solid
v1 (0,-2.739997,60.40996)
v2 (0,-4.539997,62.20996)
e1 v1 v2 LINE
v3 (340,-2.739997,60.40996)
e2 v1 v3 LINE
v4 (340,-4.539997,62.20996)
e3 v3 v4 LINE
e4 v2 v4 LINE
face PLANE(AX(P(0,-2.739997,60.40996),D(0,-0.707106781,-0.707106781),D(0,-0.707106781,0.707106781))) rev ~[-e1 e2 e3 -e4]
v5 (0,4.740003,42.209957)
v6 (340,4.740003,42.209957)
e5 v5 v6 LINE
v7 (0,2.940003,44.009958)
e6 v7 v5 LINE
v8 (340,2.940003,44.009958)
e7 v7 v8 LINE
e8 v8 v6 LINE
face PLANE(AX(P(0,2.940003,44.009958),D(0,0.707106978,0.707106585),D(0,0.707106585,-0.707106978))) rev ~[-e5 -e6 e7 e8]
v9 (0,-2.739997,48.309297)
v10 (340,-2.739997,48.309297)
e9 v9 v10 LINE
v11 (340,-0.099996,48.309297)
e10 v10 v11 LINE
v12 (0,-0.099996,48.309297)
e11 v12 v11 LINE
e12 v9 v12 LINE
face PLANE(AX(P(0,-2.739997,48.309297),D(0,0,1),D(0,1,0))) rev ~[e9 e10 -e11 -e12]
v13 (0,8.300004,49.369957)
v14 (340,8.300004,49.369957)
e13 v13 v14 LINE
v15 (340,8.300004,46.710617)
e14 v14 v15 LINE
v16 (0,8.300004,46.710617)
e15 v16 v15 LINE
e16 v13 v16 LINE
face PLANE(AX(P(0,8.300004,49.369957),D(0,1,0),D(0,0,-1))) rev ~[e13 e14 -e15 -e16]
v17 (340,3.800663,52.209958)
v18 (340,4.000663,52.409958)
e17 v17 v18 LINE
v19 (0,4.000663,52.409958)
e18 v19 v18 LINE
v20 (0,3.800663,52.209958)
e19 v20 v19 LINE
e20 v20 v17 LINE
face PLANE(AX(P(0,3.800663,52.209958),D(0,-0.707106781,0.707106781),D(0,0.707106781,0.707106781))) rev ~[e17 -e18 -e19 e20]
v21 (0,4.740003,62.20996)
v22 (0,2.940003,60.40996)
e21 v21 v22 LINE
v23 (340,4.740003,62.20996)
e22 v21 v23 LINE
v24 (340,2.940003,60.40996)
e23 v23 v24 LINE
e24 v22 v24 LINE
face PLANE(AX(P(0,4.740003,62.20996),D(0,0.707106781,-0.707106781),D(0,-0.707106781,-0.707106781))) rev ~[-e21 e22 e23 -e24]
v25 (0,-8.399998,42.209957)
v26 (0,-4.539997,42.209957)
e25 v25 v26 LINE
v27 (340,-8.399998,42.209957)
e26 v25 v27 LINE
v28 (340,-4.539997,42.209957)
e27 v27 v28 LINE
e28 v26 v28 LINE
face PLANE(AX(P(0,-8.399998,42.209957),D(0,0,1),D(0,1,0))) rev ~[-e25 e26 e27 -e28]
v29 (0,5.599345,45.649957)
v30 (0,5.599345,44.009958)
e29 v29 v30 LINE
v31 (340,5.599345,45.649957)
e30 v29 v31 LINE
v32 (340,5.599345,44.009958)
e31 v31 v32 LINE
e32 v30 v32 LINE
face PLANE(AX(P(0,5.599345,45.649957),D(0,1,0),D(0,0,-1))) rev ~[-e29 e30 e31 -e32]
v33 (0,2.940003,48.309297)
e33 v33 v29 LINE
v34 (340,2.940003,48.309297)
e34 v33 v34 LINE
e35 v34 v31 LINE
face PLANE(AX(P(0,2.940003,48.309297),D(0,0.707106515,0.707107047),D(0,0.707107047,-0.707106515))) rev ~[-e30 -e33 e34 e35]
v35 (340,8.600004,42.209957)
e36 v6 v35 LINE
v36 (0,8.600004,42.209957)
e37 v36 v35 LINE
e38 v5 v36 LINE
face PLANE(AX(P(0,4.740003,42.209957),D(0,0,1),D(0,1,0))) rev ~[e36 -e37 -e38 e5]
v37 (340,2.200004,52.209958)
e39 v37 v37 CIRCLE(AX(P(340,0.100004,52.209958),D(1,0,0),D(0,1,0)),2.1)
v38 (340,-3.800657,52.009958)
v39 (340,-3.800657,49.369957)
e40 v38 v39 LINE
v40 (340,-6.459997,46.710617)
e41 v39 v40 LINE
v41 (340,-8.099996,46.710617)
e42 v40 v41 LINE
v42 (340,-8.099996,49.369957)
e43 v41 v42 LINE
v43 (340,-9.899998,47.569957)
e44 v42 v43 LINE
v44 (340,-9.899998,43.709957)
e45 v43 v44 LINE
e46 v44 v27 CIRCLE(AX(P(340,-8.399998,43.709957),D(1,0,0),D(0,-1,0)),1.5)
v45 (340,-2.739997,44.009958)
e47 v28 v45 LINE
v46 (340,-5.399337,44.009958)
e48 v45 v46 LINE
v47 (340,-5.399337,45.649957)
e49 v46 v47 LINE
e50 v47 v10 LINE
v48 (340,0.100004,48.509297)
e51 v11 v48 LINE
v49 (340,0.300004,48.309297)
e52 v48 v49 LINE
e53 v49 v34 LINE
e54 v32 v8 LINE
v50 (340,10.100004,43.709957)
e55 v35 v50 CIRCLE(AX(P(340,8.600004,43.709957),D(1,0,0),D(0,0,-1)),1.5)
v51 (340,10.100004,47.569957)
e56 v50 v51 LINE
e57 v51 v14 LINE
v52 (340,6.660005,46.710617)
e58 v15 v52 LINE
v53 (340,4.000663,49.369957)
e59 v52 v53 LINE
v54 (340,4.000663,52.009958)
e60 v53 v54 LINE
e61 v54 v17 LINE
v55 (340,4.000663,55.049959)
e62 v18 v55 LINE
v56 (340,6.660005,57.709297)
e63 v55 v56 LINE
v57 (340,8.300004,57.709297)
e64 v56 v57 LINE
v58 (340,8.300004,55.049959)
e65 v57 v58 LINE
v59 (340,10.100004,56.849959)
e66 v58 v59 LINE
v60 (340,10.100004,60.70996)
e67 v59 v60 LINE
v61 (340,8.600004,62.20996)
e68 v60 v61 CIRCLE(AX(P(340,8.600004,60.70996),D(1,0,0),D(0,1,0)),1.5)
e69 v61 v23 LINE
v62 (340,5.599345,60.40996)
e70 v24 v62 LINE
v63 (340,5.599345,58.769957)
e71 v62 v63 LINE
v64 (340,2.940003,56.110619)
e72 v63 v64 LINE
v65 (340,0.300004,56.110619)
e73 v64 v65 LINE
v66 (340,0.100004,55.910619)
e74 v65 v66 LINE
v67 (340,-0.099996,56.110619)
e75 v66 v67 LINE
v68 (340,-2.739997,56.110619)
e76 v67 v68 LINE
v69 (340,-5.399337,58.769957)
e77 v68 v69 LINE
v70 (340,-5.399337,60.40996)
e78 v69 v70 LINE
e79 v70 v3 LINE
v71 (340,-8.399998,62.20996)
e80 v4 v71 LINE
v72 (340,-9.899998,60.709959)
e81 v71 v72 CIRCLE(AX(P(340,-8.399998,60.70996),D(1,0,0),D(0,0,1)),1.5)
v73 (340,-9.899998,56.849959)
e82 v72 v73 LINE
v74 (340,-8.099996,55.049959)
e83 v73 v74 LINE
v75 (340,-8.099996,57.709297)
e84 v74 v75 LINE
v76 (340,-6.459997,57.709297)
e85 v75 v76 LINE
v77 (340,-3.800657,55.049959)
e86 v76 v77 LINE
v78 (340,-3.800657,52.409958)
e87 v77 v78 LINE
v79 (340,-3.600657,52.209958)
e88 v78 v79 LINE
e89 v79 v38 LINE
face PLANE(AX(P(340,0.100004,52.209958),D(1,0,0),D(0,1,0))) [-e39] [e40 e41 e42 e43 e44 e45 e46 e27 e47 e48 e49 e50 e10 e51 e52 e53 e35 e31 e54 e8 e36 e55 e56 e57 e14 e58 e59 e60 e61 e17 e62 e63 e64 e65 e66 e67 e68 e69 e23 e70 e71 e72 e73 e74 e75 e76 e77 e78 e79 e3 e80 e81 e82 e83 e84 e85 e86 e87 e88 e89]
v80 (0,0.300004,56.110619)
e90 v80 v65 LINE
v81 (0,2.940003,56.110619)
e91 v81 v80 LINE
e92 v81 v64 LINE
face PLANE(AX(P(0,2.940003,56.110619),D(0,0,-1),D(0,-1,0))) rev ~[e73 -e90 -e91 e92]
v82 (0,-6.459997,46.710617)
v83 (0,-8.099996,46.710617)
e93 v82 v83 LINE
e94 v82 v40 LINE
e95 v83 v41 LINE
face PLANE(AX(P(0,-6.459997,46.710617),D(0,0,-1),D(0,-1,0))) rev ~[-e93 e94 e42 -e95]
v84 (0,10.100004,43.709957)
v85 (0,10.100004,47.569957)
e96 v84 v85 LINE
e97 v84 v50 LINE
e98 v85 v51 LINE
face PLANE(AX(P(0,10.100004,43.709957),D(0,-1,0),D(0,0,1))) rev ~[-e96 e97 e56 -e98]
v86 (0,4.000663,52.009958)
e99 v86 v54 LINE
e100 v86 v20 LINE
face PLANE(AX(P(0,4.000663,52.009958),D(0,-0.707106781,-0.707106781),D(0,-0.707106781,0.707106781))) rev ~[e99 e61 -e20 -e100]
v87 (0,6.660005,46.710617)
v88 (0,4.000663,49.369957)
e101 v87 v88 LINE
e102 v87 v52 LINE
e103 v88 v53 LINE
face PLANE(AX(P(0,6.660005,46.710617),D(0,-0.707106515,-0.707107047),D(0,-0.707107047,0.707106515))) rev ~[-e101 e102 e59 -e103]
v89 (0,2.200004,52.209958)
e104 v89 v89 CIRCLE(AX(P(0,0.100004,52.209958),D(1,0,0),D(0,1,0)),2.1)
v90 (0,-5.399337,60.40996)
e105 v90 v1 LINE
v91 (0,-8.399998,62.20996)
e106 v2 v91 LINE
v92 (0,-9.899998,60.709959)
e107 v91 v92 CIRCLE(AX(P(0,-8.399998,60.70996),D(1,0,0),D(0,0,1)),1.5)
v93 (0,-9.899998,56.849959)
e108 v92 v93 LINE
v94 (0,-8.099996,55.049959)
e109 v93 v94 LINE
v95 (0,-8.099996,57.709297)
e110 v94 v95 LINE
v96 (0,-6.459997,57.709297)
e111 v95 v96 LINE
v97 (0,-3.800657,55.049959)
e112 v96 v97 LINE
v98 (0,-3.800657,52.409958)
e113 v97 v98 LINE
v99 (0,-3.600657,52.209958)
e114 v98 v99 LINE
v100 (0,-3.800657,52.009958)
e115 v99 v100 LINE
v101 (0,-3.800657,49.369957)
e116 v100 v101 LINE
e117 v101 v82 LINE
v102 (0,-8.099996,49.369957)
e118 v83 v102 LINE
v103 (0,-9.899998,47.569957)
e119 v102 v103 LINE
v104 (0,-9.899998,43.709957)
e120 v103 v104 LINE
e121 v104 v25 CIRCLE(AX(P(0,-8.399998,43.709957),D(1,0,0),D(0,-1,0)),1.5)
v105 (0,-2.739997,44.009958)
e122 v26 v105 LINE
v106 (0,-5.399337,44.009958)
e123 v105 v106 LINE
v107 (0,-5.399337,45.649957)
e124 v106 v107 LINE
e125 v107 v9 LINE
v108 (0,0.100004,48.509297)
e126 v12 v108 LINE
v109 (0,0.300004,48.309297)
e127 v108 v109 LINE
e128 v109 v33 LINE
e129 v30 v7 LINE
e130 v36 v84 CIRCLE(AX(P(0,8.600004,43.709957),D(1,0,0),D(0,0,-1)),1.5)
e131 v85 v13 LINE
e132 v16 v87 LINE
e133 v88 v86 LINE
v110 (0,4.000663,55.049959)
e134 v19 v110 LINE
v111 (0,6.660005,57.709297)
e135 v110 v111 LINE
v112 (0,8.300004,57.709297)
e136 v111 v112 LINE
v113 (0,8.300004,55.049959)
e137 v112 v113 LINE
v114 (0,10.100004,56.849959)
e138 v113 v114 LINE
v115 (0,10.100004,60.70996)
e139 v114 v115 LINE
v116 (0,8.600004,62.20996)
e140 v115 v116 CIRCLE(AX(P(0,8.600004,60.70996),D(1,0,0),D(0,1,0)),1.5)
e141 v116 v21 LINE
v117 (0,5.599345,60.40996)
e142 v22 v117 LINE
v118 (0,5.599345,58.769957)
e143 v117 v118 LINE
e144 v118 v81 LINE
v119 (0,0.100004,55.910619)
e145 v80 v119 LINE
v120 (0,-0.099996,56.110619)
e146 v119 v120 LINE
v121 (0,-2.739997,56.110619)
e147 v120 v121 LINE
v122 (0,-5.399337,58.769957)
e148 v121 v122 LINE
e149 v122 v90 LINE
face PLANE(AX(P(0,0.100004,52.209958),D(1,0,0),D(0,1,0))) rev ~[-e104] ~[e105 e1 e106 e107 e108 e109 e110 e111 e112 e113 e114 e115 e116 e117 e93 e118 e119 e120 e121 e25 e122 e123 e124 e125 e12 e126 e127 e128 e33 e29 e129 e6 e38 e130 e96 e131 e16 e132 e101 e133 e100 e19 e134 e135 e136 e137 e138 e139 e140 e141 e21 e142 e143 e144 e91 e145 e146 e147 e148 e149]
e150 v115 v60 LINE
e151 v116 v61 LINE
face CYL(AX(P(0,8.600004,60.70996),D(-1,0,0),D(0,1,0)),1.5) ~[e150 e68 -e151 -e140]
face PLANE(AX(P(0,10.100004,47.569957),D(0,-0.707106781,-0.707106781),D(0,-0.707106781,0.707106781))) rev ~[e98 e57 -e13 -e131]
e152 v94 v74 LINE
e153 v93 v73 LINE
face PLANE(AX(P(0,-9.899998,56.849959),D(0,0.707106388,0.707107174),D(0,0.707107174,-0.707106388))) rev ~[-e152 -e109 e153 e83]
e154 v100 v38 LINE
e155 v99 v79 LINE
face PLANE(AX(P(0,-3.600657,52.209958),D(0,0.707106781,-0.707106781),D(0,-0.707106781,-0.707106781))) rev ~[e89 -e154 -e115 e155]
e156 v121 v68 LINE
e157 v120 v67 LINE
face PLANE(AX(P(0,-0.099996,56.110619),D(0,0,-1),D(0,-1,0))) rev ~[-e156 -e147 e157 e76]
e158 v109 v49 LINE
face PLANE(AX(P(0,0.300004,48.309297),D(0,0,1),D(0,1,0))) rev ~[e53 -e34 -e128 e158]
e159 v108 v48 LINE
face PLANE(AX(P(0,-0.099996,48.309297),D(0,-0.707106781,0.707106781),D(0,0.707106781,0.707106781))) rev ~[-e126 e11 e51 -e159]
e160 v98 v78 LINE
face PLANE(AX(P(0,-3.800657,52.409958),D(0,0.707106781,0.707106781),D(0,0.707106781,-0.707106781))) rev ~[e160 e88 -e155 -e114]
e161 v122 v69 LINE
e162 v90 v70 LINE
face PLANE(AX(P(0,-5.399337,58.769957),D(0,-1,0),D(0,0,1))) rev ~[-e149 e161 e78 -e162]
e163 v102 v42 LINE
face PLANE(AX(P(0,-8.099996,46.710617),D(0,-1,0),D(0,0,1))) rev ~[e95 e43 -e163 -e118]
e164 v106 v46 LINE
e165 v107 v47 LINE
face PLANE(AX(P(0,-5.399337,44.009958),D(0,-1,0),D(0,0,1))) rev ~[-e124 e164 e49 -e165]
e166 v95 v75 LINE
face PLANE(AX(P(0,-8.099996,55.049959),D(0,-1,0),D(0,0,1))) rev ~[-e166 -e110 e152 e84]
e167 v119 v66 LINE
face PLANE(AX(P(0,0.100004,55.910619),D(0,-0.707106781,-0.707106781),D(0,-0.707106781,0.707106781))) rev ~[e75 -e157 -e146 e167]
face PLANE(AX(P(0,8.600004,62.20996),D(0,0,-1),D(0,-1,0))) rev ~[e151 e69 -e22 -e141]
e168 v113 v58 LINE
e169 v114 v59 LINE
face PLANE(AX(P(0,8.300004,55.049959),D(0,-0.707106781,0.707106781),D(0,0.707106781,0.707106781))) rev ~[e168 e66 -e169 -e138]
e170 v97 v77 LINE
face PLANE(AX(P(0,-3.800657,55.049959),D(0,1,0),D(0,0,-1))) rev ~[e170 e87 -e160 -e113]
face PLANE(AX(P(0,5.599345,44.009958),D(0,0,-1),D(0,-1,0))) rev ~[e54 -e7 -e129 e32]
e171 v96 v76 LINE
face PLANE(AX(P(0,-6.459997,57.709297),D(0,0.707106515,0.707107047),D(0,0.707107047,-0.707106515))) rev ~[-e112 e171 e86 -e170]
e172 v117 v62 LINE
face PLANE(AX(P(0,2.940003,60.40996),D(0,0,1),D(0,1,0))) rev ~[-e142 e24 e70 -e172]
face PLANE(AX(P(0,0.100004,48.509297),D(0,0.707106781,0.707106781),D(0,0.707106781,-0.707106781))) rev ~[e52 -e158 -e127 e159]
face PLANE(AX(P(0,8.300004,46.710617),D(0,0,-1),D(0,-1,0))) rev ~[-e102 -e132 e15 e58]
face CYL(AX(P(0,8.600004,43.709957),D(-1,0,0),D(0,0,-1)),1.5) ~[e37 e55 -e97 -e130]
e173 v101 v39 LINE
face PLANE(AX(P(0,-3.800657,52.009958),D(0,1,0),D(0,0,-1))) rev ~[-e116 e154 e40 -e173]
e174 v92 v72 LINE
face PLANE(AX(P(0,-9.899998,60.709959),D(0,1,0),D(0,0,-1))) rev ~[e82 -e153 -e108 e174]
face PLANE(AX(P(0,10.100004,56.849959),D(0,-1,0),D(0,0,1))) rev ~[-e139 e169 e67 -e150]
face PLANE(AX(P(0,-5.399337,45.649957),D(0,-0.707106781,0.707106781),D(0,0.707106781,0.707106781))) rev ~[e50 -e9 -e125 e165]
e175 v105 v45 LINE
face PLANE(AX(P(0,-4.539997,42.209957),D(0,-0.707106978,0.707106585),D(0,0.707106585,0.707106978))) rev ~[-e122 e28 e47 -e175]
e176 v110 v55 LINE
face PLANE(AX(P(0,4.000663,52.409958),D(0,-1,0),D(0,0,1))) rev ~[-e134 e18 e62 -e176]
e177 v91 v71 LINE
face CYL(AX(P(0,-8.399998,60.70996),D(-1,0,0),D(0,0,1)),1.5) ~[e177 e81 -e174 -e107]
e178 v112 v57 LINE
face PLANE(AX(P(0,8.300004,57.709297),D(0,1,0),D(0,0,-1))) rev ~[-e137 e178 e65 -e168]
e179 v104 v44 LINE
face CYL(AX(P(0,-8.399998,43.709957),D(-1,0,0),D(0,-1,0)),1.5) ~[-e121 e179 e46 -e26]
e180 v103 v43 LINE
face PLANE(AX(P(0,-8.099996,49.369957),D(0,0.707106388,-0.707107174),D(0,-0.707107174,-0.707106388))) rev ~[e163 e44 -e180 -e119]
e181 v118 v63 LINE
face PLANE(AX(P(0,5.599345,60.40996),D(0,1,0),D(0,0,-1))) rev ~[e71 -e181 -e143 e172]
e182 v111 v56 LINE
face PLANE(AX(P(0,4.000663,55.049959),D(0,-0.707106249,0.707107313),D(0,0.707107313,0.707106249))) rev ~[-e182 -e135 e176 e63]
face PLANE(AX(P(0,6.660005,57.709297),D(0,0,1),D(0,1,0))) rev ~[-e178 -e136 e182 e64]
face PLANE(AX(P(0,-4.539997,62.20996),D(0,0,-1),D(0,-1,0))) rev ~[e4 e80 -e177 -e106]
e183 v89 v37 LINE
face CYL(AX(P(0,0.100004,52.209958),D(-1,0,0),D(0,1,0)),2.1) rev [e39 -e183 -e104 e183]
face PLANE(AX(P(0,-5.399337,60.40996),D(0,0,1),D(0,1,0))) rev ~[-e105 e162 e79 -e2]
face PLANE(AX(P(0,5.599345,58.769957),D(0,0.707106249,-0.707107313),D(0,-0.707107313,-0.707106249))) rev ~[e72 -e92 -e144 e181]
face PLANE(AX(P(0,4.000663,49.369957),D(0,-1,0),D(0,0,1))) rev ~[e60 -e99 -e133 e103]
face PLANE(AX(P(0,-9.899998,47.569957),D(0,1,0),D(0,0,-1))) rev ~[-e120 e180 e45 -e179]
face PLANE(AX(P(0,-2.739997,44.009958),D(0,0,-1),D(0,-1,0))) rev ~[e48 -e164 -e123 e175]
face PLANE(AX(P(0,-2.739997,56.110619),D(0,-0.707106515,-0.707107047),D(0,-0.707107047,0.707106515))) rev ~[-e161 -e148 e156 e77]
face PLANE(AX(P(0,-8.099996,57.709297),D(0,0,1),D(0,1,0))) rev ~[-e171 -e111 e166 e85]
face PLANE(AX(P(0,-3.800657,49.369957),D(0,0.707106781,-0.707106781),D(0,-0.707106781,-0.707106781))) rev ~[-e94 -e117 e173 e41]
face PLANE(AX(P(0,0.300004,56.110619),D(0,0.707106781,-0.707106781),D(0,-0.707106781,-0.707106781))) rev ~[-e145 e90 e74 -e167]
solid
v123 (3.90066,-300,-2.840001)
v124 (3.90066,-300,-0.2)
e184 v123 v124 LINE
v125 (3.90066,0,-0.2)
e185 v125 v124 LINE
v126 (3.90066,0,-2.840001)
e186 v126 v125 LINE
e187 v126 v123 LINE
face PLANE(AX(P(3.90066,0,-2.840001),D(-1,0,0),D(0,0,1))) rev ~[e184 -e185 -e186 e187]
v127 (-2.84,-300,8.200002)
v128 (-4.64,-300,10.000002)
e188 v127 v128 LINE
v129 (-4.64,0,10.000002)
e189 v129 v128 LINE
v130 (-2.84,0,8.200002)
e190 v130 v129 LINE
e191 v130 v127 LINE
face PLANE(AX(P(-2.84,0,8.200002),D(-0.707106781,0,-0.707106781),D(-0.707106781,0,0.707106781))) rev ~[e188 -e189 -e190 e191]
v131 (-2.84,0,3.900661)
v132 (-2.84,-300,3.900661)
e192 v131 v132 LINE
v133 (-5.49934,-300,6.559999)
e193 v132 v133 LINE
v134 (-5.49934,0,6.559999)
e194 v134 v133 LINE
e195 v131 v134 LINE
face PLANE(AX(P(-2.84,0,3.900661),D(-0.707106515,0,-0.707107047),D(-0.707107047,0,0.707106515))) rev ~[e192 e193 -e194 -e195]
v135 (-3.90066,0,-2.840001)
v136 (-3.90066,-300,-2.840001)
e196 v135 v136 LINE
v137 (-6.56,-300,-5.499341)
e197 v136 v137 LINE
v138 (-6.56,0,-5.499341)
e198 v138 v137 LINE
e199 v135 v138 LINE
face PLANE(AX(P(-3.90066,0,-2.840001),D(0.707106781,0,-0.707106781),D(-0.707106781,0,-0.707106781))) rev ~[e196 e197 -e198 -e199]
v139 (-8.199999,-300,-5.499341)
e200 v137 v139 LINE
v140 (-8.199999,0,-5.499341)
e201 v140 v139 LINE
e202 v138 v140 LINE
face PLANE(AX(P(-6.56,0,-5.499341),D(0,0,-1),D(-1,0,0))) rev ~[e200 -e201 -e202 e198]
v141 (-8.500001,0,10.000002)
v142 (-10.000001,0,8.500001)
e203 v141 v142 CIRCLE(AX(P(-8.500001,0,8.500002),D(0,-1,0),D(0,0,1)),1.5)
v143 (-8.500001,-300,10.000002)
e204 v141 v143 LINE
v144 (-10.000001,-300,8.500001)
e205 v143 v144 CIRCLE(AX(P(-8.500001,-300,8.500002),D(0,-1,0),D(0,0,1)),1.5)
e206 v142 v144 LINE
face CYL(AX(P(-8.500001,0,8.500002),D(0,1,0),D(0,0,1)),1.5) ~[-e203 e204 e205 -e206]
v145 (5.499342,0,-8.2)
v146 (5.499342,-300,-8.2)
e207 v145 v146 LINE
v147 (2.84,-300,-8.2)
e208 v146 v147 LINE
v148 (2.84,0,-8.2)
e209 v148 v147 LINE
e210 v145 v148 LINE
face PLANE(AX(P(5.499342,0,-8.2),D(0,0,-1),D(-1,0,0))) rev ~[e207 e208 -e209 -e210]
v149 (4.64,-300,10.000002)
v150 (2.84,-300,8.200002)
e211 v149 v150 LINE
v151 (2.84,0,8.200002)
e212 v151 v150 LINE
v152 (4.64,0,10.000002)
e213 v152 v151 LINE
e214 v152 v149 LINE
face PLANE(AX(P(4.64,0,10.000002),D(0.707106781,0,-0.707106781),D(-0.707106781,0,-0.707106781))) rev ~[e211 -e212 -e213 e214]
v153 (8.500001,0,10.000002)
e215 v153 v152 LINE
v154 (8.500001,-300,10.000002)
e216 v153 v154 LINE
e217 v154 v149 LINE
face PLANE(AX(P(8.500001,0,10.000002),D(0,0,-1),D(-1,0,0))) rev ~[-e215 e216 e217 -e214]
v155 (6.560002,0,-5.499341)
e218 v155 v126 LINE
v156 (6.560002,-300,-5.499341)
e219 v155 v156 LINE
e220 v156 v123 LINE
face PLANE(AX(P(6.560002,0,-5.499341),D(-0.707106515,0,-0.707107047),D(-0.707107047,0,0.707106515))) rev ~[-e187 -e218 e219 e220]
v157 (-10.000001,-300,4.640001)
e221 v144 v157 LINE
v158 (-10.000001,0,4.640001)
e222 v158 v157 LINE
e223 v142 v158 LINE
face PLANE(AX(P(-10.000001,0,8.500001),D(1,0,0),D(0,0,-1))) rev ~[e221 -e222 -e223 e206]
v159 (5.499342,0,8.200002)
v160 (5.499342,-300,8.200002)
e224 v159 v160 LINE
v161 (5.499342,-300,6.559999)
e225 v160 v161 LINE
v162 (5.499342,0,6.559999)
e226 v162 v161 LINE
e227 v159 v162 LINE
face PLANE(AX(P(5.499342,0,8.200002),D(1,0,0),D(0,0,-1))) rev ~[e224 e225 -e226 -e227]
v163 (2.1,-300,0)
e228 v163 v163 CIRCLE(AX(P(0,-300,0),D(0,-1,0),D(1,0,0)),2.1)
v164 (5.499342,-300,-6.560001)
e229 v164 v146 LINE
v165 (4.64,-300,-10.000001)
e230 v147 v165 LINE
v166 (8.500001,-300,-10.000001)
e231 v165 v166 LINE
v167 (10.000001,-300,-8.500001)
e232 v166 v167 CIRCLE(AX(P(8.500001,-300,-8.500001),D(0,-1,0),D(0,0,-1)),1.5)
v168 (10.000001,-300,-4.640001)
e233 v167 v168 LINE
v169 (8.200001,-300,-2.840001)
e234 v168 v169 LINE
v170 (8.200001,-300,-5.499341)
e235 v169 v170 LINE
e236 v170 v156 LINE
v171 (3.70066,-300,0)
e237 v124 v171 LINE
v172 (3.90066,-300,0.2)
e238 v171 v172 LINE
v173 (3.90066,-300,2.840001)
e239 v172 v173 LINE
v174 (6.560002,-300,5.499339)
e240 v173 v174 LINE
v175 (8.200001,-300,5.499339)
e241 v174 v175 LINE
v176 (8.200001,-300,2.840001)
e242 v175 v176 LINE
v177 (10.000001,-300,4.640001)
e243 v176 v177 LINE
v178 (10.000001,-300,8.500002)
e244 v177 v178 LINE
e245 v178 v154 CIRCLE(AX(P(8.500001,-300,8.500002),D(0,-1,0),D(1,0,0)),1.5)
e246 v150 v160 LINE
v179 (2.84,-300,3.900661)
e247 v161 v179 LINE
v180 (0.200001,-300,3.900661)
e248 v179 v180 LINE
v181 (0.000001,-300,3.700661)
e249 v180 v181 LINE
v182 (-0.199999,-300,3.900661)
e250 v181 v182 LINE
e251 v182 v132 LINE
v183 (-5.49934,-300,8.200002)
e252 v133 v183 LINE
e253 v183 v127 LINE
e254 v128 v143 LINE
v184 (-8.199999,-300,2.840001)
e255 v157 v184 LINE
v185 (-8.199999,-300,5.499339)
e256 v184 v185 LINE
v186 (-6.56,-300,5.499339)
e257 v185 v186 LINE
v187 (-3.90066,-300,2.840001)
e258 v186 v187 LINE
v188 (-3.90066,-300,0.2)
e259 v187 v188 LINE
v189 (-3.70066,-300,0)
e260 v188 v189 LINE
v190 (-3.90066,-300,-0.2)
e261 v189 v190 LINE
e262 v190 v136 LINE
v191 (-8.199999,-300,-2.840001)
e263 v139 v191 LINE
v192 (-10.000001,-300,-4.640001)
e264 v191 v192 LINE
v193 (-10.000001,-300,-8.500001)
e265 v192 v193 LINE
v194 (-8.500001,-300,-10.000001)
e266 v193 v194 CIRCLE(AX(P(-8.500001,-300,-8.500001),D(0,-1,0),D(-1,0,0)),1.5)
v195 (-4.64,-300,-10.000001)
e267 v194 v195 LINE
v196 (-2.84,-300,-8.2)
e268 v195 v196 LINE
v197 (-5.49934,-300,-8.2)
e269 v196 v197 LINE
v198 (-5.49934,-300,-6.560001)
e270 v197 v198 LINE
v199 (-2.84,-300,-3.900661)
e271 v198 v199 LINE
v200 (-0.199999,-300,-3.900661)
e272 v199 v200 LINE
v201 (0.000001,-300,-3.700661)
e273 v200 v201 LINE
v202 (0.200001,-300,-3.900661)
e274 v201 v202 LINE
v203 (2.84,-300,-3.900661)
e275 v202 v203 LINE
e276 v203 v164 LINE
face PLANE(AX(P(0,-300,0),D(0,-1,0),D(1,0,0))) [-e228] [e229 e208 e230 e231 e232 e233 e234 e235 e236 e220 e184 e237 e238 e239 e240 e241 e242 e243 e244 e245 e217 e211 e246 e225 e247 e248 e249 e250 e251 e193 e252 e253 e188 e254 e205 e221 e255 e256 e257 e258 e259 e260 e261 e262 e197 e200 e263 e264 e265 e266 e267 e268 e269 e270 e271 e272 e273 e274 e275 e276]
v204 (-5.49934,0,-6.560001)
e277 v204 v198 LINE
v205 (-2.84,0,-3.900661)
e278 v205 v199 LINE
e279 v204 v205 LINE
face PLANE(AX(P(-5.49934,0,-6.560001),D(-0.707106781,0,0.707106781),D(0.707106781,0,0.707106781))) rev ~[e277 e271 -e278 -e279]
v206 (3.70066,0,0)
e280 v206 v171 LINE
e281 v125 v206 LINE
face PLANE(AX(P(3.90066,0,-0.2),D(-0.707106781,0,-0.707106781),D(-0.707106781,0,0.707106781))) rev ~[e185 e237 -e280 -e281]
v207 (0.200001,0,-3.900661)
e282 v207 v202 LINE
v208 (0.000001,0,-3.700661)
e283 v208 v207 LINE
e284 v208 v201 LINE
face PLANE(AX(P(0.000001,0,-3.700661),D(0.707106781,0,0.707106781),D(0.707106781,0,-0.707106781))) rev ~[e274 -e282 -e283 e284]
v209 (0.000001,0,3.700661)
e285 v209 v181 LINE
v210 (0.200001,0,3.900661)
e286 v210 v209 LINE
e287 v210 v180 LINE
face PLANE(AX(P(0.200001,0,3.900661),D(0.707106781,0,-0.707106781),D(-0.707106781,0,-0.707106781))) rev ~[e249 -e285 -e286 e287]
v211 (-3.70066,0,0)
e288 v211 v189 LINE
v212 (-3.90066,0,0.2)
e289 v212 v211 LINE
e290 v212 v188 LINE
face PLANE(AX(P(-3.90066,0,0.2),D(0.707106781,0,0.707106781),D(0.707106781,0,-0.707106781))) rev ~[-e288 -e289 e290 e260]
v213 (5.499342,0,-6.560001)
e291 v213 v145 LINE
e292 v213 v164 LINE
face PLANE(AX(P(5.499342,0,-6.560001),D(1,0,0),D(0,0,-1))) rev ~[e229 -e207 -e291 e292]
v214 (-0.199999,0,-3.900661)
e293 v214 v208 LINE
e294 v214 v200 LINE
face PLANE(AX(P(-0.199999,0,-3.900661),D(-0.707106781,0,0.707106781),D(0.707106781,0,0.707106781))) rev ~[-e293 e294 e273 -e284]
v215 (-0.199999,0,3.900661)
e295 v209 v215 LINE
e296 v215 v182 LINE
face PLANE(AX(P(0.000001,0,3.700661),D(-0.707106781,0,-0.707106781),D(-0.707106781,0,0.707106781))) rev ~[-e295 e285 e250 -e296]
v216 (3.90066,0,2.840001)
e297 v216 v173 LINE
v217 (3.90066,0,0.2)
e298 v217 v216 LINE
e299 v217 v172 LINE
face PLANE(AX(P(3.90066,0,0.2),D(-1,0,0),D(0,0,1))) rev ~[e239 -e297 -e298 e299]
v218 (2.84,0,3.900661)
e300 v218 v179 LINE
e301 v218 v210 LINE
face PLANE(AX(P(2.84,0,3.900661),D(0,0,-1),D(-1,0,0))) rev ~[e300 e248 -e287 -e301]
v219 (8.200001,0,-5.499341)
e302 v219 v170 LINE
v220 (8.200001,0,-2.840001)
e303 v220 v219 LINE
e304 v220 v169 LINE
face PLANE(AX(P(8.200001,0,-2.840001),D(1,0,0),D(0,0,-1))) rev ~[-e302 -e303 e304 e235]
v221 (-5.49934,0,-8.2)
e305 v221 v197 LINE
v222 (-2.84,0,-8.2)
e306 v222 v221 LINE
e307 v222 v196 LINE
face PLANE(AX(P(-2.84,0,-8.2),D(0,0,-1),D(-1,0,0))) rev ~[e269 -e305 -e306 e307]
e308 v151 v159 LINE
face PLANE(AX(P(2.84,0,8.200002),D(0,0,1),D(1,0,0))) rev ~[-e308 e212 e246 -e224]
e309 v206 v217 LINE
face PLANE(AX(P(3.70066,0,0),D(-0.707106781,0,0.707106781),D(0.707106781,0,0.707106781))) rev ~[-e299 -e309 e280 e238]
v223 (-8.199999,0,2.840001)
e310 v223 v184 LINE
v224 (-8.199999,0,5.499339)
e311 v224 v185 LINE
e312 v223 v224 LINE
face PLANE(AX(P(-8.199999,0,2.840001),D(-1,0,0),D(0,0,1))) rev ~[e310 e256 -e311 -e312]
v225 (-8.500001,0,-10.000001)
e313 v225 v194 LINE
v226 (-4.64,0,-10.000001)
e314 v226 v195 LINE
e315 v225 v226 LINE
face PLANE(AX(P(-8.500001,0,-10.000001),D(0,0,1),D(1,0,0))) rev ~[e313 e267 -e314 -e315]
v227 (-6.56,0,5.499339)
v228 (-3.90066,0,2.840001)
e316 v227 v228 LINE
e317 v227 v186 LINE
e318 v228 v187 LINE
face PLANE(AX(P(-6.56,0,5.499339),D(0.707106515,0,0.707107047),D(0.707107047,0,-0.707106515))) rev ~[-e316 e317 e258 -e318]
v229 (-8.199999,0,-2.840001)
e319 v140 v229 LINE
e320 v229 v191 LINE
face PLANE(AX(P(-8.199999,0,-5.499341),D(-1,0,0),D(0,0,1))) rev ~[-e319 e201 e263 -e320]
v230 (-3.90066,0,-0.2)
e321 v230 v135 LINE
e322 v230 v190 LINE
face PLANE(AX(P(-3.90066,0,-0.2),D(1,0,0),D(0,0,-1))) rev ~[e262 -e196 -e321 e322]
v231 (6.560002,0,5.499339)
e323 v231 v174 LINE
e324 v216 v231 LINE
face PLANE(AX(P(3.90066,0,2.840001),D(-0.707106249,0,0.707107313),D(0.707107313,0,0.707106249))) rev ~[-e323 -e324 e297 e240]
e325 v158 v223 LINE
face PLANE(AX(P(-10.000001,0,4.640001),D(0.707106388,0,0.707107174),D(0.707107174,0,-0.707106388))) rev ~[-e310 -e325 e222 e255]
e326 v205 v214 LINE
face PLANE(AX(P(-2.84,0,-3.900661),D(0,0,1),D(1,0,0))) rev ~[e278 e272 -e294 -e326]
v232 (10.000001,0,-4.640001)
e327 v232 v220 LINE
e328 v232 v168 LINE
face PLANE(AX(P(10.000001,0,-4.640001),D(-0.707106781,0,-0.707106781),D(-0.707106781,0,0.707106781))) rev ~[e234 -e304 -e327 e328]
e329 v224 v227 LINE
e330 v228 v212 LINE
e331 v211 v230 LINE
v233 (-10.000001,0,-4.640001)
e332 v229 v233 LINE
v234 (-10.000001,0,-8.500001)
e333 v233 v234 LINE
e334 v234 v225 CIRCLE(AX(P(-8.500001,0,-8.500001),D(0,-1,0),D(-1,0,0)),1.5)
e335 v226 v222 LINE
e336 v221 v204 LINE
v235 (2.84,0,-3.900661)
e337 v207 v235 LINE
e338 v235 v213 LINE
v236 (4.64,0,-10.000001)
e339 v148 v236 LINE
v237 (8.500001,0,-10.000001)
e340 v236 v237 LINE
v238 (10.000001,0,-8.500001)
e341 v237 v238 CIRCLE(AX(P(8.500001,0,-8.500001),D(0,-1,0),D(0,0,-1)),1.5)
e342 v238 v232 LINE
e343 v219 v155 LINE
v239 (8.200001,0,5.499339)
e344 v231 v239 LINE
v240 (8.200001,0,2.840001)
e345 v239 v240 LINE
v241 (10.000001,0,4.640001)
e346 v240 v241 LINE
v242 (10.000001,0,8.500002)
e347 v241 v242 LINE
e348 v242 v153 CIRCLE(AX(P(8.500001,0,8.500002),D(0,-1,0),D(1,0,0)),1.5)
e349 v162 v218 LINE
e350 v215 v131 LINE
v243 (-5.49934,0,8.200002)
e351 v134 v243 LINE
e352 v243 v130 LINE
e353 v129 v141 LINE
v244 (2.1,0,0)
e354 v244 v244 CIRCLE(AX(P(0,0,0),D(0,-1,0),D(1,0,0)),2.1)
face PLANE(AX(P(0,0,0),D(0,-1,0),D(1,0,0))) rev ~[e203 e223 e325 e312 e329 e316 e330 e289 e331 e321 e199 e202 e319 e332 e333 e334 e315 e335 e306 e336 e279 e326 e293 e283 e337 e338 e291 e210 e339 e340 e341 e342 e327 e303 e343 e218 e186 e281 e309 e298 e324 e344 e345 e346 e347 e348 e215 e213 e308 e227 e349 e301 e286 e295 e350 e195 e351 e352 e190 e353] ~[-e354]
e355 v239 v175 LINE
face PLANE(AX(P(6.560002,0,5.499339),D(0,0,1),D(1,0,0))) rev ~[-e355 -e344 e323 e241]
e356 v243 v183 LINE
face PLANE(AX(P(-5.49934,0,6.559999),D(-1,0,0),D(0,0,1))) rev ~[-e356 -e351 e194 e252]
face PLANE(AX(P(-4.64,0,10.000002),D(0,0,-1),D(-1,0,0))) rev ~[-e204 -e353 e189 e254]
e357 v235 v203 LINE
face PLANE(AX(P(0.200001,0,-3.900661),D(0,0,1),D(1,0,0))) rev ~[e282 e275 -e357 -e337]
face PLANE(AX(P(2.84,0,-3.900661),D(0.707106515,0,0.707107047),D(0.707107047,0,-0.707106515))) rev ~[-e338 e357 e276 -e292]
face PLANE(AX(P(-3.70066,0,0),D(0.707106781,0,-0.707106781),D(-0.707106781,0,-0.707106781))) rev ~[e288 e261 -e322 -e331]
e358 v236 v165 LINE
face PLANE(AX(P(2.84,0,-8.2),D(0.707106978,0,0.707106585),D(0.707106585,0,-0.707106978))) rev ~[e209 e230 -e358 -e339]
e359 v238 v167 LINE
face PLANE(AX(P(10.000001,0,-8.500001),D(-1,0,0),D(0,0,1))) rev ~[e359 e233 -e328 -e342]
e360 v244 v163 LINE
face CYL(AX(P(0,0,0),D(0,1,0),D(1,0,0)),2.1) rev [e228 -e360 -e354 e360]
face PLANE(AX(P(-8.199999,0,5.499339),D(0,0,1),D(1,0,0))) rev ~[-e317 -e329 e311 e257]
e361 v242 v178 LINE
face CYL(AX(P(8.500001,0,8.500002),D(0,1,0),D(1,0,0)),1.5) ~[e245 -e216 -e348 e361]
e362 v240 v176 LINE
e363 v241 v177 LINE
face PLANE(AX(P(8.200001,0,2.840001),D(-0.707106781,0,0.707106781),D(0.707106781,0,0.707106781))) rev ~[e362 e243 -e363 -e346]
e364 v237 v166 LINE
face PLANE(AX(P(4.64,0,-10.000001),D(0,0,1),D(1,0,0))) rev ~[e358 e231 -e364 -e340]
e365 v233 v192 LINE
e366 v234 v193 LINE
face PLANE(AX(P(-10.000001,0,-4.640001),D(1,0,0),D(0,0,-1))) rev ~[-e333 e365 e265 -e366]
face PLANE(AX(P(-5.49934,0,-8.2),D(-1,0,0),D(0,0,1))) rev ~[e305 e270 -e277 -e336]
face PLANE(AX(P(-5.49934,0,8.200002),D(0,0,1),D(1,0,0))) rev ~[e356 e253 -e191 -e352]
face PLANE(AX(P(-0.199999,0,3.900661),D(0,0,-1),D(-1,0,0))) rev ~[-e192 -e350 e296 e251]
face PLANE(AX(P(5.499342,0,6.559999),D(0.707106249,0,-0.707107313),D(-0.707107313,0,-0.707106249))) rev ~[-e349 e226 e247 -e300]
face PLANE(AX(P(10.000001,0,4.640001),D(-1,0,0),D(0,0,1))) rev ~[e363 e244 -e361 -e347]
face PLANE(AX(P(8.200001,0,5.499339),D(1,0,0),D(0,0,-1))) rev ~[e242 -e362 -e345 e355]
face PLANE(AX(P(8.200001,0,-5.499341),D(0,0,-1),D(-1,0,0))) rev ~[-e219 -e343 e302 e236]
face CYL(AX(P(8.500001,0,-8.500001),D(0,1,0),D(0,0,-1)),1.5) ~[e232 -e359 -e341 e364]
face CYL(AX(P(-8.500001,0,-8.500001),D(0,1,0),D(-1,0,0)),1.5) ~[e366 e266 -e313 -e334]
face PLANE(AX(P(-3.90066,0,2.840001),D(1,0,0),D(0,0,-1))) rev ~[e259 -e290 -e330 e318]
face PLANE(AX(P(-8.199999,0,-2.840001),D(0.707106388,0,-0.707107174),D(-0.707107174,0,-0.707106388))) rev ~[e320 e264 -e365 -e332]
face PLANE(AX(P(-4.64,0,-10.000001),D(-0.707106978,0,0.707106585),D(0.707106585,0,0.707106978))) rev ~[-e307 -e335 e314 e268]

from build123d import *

# Parameters (mm, degrees)
F0_R     = 2.1
F2_DEPTH = 300
F1_R     = 2.1
F3_DEPTH = 340


# Not quite as in the source:
# - ends of sketch curves that miss each other by under 0.0002 mm in the source are joined


with BuildPart() as f2:
    # F0 (on Front) → F2 (new body)
    with BuildSketch(Plane.XZ):
        with BuildLine():
            Line((-4.6400004426, 10.0000019805), (-8.5000014426, 10.0000019805))
            ThreePointArc((-8.5000014426, 10.0000019805), (-9.560661968, 9.5606617987), (-10.0000014426, 8.5000009805))
            Line((-10.0000014426, 8.5000009805), (-10.0000014426, 4.6400009805))
            Line((-10.0000014426, 4.6400009805), (-8.1999994426, 2.8400009805))
            Line((-8.1999994426, 2.8400009805), (-8.1999994426, 5.4993389805))
            Line((-8.1999994426, 5.4993389805), (-6.5600004426, 5.4993389805))
            Line((-6.5600004426, 5.4993389805), (-3.9006604426, 2.8400009805))
            Line((-3.9006604426, 2.8400009805), (-3.9006604426, 0.1999999805))
            Line((-3.9006604426, 0.1999999805), (-3.7006604426, -1.95e-08))
            Line((-3.7006604426, -1.95e-08), (-3.9006604426, -0.2000000195))
            Line((-3.9006604426, -0.2000000195), (-3.9006604426, -2.8400010195))
            Line((-3.9006604426, -2.8400010195), (-6.5600004426, -5.4993410195))
            Line((-6.5600004426, -5.4993410195), (-8.1999994426, -5.4993410195))
            Line((-8.1999994426, -5.4993410195), (-8.1999994426, -2.8400010195))
            Line((-8.1999994426, -2.8400010195), (-10.0000014426, -4.6400010195))
            Line((-10.0000014426, -4.6400010195), (-10.0000014426, -8.5000010195))
            ThreePointArc((-10.0000014426, -8.5000010195), (-9.5606612608, -9.5606615448), (-8.5000014426, -10.0000010195))
            Line((-8.5000014426, -10.0000010195), (-4.6400004426, -10.0000010195))
            Line((-4.6400004426, -10.0000010195), (-2.8400004426, -8.2000000195))
            Line((-2.8400004426, -8.2000000195), (-5.4993404426, -8.2000000195))
            Line((-5.4993404426, -8.2000000195), (-5.4993404426, -6.5600010195))
            Line((-5.4993404426, -6.5600010195), (-2.8400004426, -3.9006610195))
            Line((-2.8400004426, -3.9006610195), (-0.1999994426, -3.9006610195))
            Line((-0.1999994426, -3.9006610195), (5.574e-07, -3.7006610195))
            Line((5.574e-07, -3.7006610195), (0.2000005574, -3.9006610195))
            Line((0.2000005574, -3.9006610195), (2.8399995574, -3.9006610195))
            Line((2.8399995574, -3.9006610195), (5.4993415574, -6.5600010195))
            Line((5.4993415574, -6.5600010195), (5.4993415574, -8.2000000195))
            Line((5.4993415574, -8.2000000195), (2.8399995574, -8.2000000195))
            Line((2.8399995574, -8.2000000195), (4.6399995574, -10.0000010195))
            Line((4.6399995574, -10.0000010195), (8.5000005574, -10.0000010195))
            ThreePointArc((8.5000005574, -10.0000010195), (9.5606607292, -9.5606611913), (10.0000005574, -8.5000010195))
            Line((10.0000005574, -8.5000010195), (10.0000005574, -4.6400010195))
            Line((10.0000005574, -4.6400010195), (8.2000005574, -2.8400010195))
            Line((8.2000005574, -2.8400010195), (8.2000005574, -5.4993410195))
            Line((8.2000005574, -5.4993410195), (6.5600015574, -5.4993410195))
            Line((6.5600015574, -5.4993410195), (3.9006595574, -2.8400010195))
            Line((3.9006595574, -2.8400010195), (3.9006595574, -0.2000000195))
            Line((3.9006595574, -0.2000000195), (3.7006595574, -1.95e-08))
            Line((3.7006595574, -1.95e-08), (3.9006595574, 0.1999999805))
            Line((3.9006595574, 0.1999999805), (3.9006595574, 2.8400009805))
            Line((3.9006595574, 2.8400009805), (6.5600015574, 5.4993389805))
            Line((6.5600015574, 5.4993389805), (8.2000005574, 5.4993389805))
            Line((8.2000005574, 5.4993389805), (8.2000005574, 2.8400009805))
            Line((8.2000005574, 2.8400009805), (10.0000005574, 4.6400009805))
            Line((10.0000005574, 4.6400009805), (10.0000005574, 8.5000019805))
            ThreePointArc((10.0000005574, 8.5000019805), (9.5606607292, 9.5606621523), (8.5000005574, 10.0000019805))
            Line((8.5000005574, 10.0000019805), (4.6399995574, 10.0000019805))
            Line((4.6399995574, 10.0000019805), (2.8399995574, 8.2000019805))
            Line((2.8399995574, 8.2000019805), (5.4993415574, 8.2000019805))
            Line((5.4993415574, 8.2000019805), (5.4993415574, 6.5599989805))
            Line((5.4993415574, 6.5599989805), (2.8399995574, 3.9006609805))
            Line((2.8399995574, 3.9006609805), (0.2000005574, 3.9006609805))
            Line((0.2000005574, 3.9006609805), (5.574e-07, 3.7006609805))
            Line((5.574e-07, 3.7006609805), (-0.1999994426, 3.9006609805))
            Line((-0.1999994426, 3.9006609805), (-2.8400004426, 3.9006609805))
            Line((-2.8400004426, 3.9006609805), (-5.4993404426, 6.5599989805))
            Line((-5.4993404426, 6.5599989805), (-5.4993404426, 8.2000019805))
            Line((-5.4993404426, 8.2000019805), (-2.8400004426, 8.2000019805))
            Line((-2.8400004426, 8.2000019805), (-4.6400004426, 10.0000019805))
        make_face()
        with Locations((5.574e-07, -1.95e-08)):
            Circle(F0_R, mode=Mode.SUBTRACT)
    extrude(amount=F2_DEPTH)


with BuildPart() as f3:
    # F1 (on Right) → F3 (new body)
    with BuildSketch(Plane.YZ):
        with BuildLine():
            Line((-4.5399968378, 62.209959795), (-8.3999978378, 62.209959795))
            ThreePointArc((-8.3999978378, 62.209959795), (-9.4606583632, 61.7706196132), (-9.8999978378, 60.709958795))
            Line((-9.8999978378, 60.709958795), (-9.8999978378, 56.849958795))
            Line((-9.8999978378, 56.849958795), (-8.0999958378, 55.049958795))
            Line((-8.0999958378, 55.049958795), (-8.0999958378, 57.709296795))
            Line((-8.0999958378, 57.709296795), (-6.4599968378, 57.709296795))
            Line((-6.4599968378, 57.709296795), (-3.8006568378, 55.049958795))
            Line((-3.8006568378, 55.049958795), (-3.8006568378, 52.409957795))
            Line((-3.8006568378, 52.409957795), (-3.6006568378, 52.209957795))
            Line((-3.6006568378, 52.209957795), (-3.8006568378, 52.009957795))
            Line((-3.8006568378, 52.009957795), (-3.8006568378, 49.369956795))
            Line((-3.8006568378, 49.369956795), (-6.4599968378, 46.710616795))
            Line((-6.4599968378, 46.710616795), (-8.0999958378, 46.710616795))
            Line((-8.0999958378, 46.710616795), (-8.0999958378, 49.369956795))
            Line((-8.0999958378, 49.369956795), (-9.8999978378, 47.569956795))
            Line((-9.8999978378, 47.569956795), (-9.8999978378, 43.709956795))
            ThreePointArc((-9.8999978378, 43.709956795), (-9.4606576561, 42.6492962696), (-8.3999978378, 42.209956795))
            Line((-8.3999978378, 42.209956795), (-4.5399968378, 42.209956795))
            Line((-4.5399968378, 42.209956795), (-2.7399968378, 44.009957795))
            Line((-2.7399968378, 44.009957795), (-5.3993368378, 44.009957795))
            Line((-5.3993368378, 44.009957795), (-5.3993368378, 45.649956795))
            Line((-5.3993368378, 45.649956795), (-2.7399968378, 48.309296795))
            Line((-2.7399968378, 48.309296795), (-0.0999958378, 48.309296795))
            Line((-0.0999958378, 48.309296795), (0.1000041622, 48.509296795))
            Line((0.1000041622, 48.509296795), (0.3000041622, 48.309296795))
            Line((0.3000041622, 48.309296795), (2.9400031622, 48.309296795))
            Line((2.9400031622, 48.309296795), (5.5993451622, 45.649956795))
            Line((5.5993451622, 45.649956795), (5.5993451622, 44.009957795))
            Line((5.5993451622, 44.009957795), (2.9400031622, 44.009957795))
            Line((2.9400031622, 44.009957795), (4.7400031622, 42.209956795))
            Line((4.7400031622, 42.209956795), (8.6000041622, 42.209956795))
            ThreePointArc((8.6000041622, 42.209956795), (9.6606643339, 42.6492966232), (10.1000041622, 43.709956795))
            Line((10.1000041622, 43.709956795), (10.1000041622, 47.569956795))
            Line((10.1000041622, 47.569956795), (8.3000041622, 49.369956795))
            Line((8.3000041622, 49.369956795), (8.3000041622, 46.710616795))
            Line((8.3000041622, 46.710616795), (6.6600051622, 46.710616795))
            Line((6.6600051622, 46.710616795), (4.0006631622, 49.369956795))
            Line((4.0006631622, 49.369956795), (4.0006631622, 52.009957795))
            Line((4.0006631622, 52.009957795), (3.8006631622, 52.209957795))
            Line((3.8006631622, 52.209957795), (4.0006631622, 52.409957795))
            Line((4.0006631622, 52.409957795), (4.0006631622, 55.049958795))
            Line((4.0006631622, 55.049958795), (6.6600051622, 57.709296795))
            Line((6.6600051622, 57.709296795), (8.3000041622, 57.709296795))
            Line((8.3000041622, 57.709296795), (8.3000041622, 55.049958795))
            Line((8.3000041622, 55.049958795), (10.1000041622, 56.849958795))
            Line((10.1000041622, 56.849958795), (10.1000041622, 60.709959795))
            ThreePointArc((10.1000041622, 60.709959795), (9.6606643339, 61.7706199668), (8.6000041622, 62.209959795))
            Line((8.6000041622, 62.209959795), (4.7400031622, 62.209959795))
            Line((4.7400031622, 62.209959795), (2.9400031622, 60.409959795))
            Line((2.9400031622, 60.409959795), (5.5993451622, 60.409959795))
            Line((5.5993451622, 60.409959795), (5.5993451622, 58.769956795))
            Line((5.5993451622, 58.769956795), (2.9400031622, 56.110618795))
            Line((2.9400031622, 56.110618795), (0.3000041622, 56.110618795))
            Line((0.3000041622, 56.110618795), (0.1000041622, 55.910618795))
            Line((0.1000041622, 55.910618795), (-0.0999958378, 56.110618795))
            Line((-0.0999958378, 56.110618795), (-2.7399968378, 56.110618795))
            Line((-2.7399968378, 56.110618795), (-5.3993368378, 58.769956795))
            Line((-5.3993368378, 58.769956795), (-5.3993368378, 60.409959795))
            Line((-5.3993368378, 60.409959795), (-2.7399968378, 60.409959795))
            Line((-2.7399968378, 60.409959795), (-4.5399968378, 62.209959795))
        make_face()
        with Locations((0.1000041622, 52.209957795)):
            Circle(F1_R, mode=Mode.SUBTRACT)
    extrude(amount=F3_DEPTH)


solid = Compound([f2.part, f3.part])
